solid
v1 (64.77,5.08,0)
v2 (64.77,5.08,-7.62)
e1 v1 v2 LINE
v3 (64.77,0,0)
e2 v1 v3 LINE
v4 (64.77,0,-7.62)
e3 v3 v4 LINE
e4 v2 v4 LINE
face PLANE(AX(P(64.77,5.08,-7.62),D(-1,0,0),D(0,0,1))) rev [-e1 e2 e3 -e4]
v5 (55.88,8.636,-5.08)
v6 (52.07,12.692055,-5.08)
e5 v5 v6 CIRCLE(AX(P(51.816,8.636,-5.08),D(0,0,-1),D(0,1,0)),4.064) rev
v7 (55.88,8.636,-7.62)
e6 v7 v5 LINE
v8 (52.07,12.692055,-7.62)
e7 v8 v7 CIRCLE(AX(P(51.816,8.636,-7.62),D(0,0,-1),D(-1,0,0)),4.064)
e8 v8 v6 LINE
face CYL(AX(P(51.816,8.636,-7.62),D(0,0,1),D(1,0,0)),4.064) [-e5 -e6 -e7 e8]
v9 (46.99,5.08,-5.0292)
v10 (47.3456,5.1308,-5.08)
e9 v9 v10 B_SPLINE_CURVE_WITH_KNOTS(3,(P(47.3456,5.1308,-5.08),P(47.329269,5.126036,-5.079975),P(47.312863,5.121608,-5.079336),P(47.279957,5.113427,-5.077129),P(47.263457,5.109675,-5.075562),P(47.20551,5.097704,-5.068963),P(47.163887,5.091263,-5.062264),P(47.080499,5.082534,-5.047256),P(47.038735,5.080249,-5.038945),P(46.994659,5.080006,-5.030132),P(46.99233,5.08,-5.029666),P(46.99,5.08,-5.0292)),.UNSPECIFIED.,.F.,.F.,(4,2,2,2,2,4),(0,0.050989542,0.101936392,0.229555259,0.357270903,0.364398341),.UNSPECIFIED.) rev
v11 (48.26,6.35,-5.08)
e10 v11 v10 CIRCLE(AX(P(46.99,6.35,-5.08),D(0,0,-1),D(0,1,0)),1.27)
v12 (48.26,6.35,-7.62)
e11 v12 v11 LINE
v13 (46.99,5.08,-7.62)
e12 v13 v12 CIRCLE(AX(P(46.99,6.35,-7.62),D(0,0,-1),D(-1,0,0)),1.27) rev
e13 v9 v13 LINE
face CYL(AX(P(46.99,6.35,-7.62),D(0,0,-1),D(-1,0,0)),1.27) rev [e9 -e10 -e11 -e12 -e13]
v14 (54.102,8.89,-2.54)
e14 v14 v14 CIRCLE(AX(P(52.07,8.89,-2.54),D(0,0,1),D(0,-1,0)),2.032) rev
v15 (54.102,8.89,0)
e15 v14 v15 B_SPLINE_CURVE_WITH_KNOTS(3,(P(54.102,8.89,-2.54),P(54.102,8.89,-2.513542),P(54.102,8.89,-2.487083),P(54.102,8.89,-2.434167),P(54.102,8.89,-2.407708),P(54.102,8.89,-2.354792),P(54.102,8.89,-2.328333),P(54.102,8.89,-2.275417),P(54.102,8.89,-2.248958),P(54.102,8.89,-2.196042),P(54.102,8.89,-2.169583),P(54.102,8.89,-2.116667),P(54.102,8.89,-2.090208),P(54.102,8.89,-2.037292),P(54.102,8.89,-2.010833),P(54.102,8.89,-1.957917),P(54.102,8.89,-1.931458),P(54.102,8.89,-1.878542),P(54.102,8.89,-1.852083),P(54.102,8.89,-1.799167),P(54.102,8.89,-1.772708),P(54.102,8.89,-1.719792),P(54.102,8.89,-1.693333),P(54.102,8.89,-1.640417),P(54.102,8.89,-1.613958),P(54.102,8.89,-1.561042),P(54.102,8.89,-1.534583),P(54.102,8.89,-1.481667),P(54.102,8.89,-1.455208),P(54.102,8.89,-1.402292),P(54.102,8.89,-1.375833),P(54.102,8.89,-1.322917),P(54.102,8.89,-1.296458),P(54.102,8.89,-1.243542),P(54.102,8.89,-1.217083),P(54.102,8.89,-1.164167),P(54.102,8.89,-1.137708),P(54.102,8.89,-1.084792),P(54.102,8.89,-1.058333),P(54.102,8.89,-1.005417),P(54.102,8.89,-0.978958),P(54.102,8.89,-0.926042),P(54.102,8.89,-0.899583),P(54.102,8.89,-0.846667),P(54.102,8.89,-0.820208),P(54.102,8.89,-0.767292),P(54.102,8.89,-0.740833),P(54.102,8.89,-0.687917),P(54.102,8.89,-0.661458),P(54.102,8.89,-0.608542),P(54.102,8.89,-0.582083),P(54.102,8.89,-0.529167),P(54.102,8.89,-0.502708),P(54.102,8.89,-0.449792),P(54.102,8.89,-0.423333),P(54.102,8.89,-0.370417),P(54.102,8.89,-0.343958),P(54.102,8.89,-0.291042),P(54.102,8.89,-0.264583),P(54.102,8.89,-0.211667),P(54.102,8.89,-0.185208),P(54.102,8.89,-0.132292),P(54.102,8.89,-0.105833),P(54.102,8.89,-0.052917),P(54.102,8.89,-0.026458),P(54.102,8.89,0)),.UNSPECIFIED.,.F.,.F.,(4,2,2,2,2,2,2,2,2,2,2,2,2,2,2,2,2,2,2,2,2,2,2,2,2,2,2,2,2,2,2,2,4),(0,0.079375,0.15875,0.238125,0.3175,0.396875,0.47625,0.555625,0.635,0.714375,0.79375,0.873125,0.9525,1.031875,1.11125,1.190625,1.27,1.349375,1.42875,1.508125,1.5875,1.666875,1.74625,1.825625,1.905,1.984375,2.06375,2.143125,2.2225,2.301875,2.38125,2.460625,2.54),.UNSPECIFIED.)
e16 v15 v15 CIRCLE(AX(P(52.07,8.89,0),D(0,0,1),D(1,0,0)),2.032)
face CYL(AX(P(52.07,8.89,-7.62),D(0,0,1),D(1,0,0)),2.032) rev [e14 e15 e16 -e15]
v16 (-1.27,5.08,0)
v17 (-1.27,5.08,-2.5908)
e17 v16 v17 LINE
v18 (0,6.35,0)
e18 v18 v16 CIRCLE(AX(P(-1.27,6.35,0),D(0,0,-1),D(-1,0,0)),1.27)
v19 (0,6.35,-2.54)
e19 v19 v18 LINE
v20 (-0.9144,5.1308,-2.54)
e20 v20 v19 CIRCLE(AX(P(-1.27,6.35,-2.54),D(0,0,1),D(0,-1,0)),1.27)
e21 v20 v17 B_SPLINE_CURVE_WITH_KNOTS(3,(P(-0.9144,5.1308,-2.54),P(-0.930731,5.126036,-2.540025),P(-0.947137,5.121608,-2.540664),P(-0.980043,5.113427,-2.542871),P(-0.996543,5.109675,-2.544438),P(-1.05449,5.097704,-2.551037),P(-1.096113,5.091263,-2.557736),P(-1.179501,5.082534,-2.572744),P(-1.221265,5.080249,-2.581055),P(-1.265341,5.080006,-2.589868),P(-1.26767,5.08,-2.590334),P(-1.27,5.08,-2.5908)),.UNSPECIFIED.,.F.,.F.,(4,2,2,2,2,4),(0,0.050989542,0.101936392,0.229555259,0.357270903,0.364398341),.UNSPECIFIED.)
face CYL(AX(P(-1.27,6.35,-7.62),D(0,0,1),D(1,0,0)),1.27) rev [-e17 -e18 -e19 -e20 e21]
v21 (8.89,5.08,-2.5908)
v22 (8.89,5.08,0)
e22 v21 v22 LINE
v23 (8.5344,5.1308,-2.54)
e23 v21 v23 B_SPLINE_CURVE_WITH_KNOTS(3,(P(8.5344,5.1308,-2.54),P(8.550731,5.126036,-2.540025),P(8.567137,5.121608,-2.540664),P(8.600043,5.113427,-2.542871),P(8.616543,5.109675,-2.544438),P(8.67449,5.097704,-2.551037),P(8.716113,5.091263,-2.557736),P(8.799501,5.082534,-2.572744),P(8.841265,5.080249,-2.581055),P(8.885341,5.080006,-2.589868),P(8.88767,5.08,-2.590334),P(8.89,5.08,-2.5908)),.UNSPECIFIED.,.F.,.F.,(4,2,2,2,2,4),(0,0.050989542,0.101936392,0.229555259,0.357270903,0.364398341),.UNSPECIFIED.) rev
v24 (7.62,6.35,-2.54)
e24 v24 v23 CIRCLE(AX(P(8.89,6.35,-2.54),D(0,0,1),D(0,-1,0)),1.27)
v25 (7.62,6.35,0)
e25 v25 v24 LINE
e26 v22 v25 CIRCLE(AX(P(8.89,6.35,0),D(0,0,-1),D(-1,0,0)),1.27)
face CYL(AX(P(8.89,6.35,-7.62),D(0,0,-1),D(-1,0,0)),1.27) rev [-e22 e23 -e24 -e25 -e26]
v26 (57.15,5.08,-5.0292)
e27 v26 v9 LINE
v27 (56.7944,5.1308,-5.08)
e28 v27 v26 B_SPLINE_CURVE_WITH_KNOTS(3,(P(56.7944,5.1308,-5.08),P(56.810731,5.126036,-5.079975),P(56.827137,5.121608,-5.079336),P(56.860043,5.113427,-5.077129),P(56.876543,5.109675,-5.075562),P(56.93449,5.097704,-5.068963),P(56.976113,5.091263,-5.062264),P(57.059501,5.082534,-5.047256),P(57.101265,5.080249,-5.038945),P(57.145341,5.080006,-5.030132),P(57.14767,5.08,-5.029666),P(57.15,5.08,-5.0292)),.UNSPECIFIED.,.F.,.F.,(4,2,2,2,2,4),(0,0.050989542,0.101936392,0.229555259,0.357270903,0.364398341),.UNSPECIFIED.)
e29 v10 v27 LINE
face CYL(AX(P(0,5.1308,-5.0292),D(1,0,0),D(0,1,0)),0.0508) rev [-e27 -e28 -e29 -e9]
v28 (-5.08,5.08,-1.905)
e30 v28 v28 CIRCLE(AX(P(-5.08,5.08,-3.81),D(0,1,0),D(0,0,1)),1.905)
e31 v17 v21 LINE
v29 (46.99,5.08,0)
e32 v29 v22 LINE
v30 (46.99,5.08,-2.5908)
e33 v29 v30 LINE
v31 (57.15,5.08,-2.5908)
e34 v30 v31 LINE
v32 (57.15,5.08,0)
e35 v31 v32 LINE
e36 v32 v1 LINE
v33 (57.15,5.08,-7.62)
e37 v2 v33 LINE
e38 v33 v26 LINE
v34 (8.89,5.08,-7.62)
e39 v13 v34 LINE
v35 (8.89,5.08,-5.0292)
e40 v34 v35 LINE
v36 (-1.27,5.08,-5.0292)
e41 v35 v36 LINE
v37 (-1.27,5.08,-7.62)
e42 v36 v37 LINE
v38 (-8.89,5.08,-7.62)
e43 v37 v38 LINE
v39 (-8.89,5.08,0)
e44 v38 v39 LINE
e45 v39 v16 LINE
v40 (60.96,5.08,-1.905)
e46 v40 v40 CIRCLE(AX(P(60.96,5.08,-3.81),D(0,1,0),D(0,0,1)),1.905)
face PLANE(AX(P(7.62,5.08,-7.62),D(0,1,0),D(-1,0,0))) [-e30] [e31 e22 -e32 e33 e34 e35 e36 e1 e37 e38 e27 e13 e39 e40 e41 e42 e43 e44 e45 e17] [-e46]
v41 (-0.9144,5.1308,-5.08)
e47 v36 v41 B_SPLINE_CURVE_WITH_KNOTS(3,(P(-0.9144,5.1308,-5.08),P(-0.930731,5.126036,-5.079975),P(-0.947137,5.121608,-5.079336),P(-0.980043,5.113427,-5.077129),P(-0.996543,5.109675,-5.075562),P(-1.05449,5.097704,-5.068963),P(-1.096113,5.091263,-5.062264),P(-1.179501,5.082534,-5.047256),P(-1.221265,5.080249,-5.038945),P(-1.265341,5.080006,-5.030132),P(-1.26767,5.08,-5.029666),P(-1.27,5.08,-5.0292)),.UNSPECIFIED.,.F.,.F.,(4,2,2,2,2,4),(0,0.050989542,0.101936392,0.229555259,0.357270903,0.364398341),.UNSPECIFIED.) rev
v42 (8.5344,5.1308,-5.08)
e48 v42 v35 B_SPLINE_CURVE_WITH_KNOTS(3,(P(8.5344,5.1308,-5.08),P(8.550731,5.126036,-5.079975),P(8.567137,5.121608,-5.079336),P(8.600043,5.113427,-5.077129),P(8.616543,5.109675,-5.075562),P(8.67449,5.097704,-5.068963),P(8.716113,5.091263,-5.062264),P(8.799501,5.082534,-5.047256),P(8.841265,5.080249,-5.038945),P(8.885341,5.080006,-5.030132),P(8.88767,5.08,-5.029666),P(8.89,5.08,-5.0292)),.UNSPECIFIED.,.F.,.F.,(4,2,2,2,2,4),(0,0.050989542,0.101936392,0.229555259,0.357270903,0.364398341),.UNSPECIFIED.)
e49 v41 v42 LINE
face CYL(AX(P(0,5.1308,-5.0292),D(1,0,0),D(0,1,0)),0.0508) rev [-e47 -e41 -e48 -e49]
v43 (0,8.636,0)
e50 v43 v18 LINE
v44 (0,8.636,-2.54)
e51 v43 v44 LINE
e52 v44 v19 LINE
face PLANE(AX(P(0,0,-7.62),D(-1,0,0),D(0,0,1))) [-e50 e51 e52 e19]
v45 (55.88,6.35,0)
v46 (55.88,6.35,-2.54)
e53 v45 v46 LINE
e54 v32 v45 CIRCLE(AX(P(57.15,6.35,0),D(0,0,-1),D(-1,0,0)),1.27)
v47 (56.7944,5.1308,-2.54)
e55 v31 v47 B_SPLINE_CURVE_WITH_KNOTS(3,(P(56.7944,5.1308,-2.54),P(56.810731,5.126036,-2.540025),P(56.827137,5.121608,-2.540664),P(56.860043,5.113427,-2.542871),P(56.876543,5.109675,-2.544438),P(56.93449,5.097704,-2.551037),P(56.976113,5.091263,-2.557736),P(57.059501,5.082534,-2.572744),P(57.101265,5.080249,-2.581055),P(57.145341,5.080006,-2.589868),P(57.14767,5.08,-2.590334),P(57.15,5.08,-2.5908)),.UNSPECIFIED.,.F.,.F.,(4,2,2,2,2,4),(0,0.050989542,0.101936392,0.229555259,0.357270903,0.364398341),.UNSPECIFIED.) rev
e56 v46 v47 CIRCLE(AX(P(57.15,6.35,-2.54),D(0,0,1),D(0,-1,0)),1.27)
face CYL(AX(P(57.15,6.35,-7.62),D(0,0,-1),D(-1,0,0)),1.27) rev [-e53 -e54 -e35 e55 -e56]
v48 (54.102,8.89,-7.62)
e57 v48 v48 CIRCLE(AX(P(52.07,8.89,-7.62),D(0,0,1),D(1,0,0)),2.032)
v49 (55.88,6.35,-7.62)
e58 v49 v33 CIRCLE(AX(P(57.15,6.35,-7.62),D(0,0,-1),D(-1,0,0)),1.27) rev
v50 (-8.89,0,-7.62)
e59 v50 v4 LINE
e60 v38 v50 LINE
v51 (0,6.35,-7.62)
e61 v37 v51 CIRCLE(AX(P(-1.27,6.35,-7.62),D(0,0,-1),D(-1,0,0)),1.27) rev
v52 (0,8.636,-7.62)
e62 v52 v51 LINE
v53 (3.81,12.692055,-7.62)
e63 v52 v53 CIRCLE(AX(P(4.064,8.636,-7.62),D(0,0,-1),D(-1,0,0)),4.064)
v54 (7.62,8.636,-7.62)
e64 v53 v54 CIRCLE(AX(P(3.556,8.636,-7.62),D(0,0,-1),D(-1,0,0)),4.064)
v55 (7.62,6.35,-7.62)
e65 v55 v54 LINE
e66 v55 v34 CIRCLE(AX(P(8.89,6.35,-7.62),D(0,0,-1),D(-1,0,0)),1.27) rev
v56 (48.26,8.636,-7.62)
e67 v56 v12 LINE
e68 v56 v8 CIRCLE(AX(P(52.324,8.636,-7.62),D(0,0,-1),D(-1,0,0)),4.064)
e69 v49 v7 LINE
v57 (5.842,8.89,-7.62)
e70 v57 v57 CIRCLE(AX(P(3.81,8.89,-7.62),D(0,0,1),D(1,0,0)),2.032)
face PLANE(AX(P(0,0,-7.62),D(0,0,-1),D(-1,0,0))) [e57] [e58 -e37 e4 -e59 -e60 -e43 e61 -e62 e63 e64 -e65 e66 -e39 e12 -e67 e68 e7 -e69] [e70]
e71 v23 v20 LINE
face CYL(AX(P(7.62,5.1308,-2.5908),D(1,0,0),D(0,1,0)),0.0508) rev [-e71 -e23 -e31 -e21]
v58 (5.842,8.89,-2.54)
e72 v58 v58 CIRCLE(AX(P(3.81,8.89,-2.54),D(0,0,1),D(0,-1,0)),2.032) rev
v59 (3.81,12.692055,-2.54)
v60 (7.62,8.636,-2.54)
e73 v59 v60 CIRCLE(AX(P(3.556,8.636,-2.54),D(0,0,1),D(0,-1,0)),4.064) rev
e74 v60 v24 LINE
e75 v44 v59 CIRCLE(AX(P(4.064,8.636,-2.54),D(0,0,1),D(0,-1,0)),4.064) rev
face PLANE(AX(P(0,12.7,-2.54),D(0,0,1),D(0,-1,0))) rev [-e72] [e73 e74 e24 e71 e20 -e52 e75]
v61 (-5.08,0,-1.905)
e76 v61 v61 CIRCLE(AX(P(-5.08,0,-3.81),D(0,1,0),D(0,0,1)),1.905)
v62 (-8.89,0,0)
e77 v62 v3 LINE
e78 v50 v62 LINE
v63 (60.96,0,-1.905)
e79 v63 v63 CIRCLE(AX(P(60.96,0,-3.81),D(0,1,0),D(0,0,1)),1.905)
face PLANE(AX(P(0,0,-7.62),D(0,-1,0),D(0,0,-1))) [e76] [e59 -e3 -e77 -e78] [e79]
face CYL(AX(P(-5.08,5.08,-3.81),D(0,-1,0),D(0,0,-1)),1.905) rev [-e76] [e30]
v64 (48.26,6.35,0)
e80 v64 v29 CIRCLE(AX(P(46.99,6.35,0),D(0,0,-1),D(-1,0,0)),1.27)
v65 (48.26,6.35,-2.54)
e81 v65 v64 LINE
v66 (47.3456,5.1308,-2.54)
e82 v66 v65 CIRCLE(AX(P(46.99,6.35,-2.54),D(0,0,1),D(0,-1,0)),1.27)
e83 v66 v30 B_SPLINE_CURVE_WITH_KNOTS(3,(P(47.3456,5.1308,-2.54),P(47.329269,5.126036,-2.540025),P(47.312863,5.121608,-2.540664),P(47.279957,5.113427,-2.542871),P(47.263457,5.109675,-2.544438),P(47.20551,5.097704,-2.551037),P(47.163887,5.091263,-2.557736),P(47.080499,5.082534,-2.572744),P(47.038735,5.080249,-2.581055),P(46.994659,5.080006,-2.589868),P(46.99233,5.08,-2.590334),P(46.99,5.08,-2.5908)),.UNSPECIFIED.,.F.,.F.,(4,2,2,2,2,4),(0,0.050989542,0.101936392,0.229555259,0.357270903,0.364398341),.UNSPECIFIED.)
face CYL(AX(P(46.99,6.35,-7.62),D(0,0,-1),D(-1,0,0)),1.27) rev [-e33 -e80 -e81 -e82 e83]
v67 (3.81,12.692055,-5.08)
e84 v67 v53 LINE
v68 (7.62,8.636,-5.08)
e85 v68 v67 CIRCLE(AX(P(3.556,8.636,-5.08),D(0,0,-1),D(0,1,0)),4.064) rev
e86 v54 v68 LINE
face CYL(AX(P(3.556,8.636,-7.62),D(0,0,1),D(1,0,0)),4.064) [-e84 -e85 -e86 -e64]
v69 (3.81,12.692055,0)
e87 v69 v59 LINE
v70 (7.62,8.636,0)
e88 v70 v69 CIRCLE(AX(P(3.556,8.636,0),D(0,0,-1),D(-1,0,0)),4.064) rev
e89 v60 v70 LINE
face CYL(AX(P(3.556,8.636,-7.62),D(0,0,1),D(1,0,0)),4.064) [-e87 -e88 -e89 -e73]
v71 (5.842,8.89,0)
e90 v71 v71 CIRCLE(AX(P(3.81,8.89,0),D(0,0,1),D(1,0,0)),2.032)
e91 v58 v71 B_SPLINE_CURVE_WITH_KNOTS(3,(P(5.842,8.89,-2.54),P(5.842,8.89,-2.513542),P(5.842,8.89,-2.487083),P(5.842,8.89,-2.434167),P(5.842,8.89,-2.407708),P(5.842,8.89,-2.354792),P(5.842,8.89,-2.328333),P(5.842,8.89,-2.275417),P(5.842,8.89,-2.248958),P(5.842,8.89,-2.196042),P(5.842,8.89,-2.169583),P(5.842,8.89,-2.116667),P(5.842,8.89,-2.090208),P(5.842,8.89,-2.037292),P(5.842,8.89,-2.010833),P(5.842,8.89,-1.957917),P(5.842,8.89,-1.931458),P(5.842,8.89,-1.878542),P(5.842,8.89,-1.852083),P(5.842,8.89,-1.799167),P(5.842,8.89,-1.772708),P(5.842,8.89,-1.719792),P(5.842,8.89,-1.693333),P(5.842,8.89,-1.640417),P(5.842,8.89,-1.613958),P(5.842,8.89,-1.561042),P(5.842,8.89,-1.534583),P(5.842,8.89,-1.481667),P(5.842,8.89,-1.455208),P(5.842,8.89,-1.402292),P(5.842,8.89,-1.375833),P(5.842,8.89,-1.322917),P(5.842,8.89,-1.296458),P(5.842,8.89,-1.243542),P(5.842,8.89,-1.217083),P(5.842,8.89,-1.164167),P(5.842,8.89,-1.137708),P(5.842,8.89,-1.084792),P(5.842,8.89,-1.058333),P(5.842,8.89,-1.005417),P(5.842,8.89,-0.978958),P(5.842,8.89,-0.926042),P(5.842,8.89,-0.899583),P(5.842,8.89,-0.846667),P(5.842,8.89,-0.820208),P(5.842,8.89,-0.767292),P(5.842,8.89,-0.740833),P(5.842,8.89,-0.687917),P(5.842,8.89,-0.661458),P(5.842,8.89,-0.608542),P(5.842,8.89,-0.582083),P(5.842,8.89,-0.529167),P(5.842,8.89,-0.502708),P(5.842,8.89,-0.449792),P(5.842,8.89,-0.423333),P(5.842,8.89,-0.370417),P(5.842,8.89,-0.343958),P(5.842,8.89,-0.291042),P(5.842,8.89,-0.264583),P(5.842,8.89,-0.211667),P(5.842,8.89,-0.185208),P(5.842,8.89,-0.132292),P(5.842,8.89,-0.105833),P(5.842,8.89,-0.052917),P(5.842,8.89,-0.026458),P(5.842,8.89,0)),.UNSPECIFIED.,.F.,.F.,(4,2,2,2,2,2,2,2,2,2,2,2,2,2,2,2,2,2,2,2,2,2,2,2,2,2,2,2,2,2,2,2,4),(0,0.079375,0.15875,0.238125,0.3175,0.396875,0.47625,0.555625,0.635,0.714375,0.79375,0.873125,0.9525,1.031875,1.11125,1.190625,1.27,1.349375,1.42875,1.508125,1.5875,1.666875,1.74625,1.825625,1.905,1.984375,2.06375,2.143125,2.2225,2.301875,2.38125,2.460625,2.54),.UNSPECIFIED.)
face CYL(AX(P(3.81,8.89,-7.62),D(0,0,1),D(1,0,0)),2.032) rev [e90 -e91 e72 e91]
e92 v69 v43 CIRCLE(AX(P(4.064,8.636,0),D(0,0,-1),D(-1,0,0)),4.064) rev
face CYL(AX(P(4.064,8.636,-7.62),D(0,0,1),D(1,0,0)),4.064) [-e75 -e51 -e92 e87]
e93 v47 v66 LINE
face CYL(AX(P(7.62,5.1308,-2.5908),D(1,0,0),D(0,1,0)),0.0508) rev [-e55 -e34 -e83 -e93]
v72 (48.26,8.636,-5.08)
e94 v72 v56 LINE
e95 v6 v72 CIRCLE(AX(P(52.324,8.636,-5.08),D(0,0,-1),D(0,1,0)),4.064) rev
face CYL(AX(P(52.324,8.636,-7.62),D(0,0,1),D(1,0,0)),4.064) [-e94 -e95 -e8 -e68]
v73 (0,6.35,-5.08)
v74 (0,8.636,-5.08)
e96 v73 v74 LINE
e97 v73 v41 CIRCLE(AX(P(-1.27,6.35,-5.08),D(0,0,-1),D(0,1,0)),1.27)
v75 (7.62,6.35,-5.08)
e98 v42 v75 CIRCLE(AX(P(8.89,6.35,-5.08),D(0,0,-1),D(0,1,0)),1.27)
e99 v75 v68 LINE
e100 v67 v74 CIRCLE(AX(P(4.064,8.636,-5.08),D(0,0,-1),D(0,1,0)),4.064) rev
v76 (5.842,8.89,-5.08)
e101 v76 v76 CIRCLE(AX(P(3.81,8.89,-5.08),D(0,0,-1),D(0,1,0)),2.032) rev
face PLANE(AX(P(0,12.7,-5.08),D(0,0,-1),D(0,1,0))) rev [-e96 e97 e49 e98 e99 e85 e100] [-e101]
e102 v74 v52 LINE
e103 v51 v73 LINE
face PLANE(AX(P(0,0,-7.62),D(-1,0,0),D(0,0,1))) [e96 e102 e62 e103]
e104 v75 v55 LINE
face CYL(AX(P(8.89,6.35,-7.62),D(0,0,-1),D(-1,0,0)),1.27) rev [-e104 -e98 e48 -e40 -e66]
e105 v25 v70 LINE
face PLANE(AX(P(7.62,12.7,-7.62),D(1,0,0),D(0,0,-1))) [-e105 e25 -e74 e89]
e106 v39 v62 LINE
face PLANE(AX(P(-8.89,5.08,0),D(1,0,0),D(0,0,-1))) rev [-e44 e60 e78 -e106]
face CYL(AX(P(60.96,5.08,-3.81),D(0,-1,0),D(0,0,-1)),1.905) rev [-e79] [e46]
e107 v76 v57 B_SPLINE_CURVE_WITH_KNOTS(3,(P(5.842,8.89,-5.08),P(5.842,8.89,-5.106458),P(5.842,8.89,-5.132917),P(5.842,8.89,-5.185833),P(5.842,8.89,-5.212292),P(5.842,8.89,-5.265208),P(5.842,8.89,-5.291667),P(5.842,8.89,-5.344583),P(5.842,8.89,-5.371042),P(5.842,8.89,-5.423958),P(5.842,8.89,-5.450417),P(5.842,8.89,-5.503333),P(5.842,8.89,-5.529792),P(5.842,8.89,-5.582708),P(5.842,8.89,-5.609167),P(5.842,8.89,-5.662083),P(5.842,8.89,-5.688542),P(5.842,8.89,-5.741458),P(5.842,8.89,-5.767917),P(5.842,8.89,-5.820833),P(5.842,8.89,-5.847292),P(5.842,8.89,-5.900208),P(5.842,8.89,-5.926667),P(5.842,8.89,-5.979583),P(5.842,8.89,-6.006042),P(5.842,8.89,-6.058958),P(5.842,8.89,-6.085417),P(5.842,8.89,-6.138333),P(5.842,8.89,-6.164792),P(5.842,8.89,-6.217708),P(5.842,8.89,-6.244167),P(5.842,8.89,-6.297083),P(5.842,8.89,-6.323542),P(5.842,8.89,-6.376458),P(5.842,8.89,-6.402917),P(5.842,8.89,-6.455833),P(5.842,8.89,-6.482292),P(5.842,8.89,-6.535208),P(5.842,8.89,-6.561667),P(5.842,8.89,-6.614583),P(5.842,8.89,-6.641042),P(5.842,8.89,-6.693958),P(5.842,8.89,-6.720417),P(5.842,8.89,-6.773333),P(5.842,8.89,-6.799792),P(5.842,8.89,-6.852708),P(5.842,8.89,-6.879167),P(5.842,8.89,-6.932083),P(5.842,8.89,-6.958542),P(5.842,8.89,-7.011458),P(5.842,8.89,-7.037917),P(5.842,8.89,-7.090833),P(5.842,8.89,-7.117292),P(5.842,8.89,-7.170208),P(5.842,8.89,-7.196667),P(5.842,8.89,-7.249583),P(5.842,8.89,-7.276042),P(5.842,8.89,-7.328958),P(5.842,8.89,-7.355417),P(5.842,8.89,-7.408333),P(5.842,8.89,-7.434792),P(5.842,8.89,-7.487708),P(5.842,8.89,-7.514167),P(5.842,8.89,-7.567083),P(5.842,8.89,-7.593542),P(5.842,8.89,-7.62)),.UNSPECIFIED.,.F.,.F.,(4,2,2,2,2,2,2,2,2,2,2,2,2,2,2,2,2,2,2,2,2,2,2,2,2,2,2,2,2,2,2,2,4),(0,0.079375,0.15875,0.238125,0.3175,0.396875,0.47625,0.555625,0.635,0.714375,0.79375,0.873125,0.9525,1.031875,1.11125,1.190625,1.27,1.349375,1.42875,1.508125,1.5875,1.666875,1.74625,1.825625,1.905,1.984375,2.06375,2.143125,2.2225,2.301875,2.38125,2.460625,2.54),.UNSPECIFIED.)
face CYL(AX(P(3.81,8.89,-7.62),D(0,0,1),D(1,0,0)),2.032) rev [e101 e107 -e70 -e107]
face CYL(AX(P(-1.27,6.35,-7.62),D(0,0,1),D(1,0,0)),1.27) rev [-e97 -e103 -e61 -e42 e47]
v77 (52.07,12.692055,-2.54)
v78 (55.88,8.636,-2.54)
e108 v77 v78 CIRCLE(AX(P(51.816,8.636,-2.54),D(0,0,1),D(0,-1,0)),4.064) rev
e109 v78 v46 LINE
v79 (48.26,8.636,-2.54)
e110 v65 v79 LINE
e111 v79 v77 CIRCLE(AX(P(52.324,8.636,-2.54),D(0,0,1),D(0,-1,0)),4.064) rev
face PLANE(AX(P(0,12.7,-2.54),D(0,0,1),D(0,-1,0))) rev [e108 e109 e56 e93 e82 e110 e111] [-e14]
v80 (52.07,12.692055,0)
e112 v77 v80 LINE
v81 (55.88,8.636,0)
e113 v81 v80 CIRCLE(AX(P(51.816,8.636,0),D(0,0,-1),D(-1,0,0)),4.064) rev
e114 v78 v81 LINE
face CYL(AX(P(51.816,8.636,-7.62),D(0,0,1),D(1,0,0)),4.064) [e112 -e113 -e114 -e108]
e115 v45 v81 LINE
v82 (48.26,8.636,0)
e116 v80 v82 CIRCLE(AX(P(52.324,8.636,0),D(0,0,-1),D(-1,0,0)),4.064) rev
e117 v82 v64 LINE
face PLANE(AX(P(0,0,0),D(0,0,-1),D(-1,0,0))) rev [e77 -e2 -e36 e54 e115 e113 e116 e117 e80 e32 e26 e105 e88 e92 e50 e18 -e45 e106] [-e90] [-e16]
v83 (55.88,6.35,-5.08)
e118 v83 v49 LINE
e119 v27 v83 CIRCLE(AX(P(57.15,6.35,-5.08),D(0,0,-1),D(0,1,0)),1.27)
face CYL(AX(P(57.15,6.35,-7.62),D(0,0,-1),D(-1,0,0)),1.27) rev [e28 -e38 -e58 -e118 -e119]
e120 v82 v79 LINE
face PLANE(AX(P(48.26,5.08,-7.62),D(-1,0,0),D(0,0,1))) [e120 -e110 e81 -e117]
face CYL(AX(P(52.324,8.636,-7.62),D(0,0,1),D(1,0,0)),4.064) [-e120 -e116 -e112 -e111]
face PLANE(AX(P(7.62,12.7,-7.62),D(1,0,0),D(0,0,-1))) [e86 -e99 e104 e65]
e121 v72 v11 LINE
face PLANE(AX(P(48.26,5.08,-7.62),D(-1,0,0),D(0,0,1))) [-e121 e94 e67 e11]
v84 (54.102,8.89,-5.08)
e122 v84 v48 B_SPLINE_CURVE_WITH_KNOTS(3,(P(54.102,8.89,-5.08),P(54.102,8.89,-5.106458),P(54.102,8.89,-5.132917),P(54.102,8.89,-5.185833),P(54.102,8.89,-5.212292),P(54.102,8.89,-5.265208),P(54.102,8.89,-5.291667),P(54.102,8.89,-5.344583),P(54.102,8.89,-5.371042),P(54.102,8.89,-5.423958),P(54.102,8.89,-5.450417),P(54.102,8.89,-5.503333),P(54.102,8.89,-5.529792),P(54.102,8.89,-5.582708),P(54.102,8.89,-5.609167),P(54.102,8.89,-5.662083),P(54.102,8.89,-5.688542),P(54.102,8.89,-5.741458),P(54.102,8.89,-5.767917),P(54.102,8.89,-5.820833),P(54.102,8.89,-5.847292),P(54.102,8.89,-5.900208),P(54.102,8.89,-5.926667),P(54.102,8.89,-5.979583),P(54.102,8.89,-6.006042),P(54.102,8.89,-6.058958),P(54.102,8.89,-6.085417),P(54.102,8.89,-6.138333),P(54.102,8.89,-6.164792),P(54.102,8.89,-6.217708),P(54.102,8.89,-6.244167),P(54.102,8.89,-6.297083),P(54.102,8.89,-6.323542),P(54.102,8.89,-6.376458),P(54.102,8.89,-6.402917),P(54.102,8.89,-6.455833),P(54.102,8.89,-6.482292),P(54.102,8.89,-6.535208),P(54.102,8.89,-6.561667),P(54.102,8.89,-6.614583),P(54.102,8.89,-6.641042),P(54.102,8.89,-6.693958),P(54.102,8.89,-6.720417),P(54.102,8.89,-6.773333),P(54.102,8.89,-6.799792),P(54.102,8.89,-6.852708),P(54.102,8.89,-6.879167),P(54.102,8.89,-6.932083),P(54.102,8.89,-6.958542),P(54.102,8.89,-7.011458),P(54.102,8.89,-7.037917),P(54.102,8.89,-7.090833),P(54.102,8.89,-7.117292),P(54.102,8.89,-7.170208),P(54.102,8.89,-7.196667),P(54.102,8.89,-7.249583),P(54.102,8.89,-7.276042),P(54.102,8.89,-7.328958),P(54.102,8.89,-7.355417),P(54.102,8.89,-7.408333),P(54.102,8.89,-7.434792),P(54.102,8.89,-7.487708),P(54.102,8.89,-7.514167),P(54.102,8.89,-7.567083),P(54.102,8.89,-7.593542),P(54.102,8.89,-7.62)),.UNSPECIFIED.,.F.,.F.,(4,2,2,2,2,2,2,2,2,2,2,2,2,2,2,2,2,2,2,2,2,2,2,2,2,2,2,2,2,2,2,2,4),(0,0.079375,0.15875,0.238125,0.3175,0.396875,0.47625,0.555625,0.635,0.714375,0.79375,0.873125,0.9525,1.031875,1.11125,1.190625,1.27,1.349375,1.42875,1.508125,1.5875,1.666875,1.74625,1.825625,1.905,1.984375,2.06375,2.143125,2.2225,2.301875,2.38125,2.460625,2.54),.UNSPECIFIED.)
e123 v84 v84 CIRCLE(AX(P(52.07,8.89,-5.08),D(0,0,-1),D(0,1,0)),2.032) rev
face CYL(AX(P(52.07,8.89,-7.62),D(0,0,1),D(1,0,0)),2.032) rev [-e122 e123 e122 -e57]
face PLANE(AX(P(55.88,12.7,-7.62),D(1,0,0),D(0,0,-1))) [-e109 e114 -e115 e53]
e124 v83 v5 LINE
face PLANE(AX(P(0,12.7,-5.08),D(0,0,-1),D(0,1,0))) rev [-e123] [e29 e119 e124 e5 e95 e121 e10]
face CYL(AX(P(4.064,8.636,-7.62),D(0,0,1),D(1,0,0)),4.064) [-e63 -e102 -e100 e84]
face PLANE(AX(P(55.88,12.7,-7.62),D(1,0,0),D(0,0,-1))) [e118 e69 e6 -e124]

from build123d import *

# Parameters (mm, degrees)
SKETCH1_R           = 2.032
BOSS_EXTRUDE1_DEPTH = 7.62
SKETCH3_W           = 2.54
SKETCH3_H           = 7.62
CUT_EXTRUDE1_DEPTH  = 55.88
FILLET2_R           = 4.064
SKETCH5_W           = 8.89
SKETCH5_H           = 7.62
SKETCH5_R           = 1.905
BOSS_EXTRUDE2_DEPTH = 5.08
FILLET3_R           = 1.27
FILLET4_R           = 0.0508


with BuildPart() as part:
    # Sketch1 → Boss-Extrude1 (new body)
    with BuildSketch(Plane.XY):
        Polygon((0, 0), (0, 12.7), (7.62, 12.7), (7.62, 5.08), (48.26, 5.08), (48.26, 12.7), (55.88, 12.7), (55.88, 0), align=None)
        with Locations((3.81, 8.89)):
            Circle(SKETCH1_R, mode=Mode.SUBTRACT)
        with Locations((52.07, 8.89)):
            Circle(SKETCH1_R, mode=Mode.SUBTRACT)
    extrude(amount=-BOSS_EXTRUDE1_DEPTH)

    # Sketch3 → Cut-Extrude1 (cut)
    with BuildSketch(Plane(origin=(55.88, 0, 0), x_dir=(0, 0, -1), z_dir=(1, 0, 0))):
        with Locations((3.81, 8.89)):
            Rectangle(SKETCH3_W, SKETCH3_H)
    extrude(amount=-CUT_EXTRUDE1_DEPTH, mode=Mode.SUBTRACT)

    # Fillet2
    # the kernel refuses this fillet: 4.064 mm, written as the material it takes off along each edge
    with BuildSketch(Plane(origin=(48.26, 12.7, 5.08), x_dir=(0, -1, 0), z_dir=(0, 0, -1)), Plane(origin=(48.26, 12.7, 10.16), x_dir=(0, -1, 0), z_dir=(0, 0, -1)), Plane(origin=(7.62, 12.7, 5.08), x_dir=(-1, 0, 0), z_dir=(0, 0, -1)), Plane(origin=(7.62, 12.7, 10.16), x_dir=(-1, 0, 0), z_dir=(0, 0, -1)), Plane(origin=(55.88, 12.7, 10.16), x_dir=(-1, 0, 0), z_dir=(0, 0, -1)), Plane(origin=(0, 12.7, 5.08), x_dir=(0, -1, 0), z_dir=(0, 0, -1)), Plane(origin=(0, 12.7, 10.16), x_dir=(0, -1, 0), z_dir=(0, 0, -1))) as fillet2_piece_1:
        with BuildLine():
            CenterArc((FILLET2_R, -FILLET2_R), FILLET2_R, 90, 90)
            Line((0, -FILLET2_R), (0, 0))
            Line((0, 0), (FILLET2_R, 0))
        make_face()
    extrude(amount=22.86, mode=Mode.SUBTRACT)
    with BuildSketch(Plane(origin=(55.88, 12.7, 5.08), x_dir=(0, -1, 0), z_dir=(0, 0, -1))) as fillet2_piece_2:
        with BuildLine():
            CenterArc((FILLET2_R, FILLET2_R), FILLET2_R, 180, 90)
            Line((0, FILLET2_R), (0, 0))
            Line((0, 0), (FILLET2_R, 0))
        make_face()
    extrude(amount=22.86, mode=Mode.SUBTRACT)

    # Sketch5 → Boss-Extrude2 (add)
    # profile 1 of 2: a face of its own
    with BuildSketch(Plane(origin=(0, 0, 0), x_dir=(1, 0, 0), z_dir=(0, 1, 0))):
        with Locations((-4.445, 3.81)):
            Rectangle(SKETCH5_W, SKETCH5_H)
        with Locations(Location((-5.08, 3.81, 0), (0, 0, 270))):
            Circle(SKETCH5_R, mode=Mode.SUBTRACT)
    # profile 2 of 2: a face of its own
    with BuildSketch(Plane(origin=(0, 0, 0), x_dir=(1, 0, 0), z_dir=(0, 1, 0))):
        with Locations((60.325, 3.81)):
            Rectangle(SKETCH5_W, SKETCH5_H)
        with Locations(Location((60.96, 3.81, 0), (0, 0, 270))):
            Circle(SKETCH5_R, mode=Mode.SUBTRACT)
    extrude(amount=BOSS_EXTRUDE2_DEPTH)

    # Fillet3
    fillet3_edges = [part.edges().sort_by_distance(p)[0] for p in [
        (0, 5.08, -1.27),
        (0, 5.08, -6.35),
        (55.88, 5.08, -6.35),
        (55.88, 5.08, -1.27),
        (7.62, 5.08, -6.35),
        (48.26, 5.08, -6.35),
        (48.26, 5.08, -1.27),
        (7.62, 5.08, -1.27),
    ]]
    fillet(fillet3_edges, radius=FILLET3_R)

    # Fillet4
    fillet4_edges = [part.edges().sort_by_distance(p)[0] for p in [
        (3.81, 5.08, -5.08),
        (3.81, 5.08, -2.54),
        (52.07, 5.08, -2.54),
        (52.07, 5.08, -5.08),
    ]]
    fillet(fillet4_edges, radius=FILLET4_R)


solid = part.part
